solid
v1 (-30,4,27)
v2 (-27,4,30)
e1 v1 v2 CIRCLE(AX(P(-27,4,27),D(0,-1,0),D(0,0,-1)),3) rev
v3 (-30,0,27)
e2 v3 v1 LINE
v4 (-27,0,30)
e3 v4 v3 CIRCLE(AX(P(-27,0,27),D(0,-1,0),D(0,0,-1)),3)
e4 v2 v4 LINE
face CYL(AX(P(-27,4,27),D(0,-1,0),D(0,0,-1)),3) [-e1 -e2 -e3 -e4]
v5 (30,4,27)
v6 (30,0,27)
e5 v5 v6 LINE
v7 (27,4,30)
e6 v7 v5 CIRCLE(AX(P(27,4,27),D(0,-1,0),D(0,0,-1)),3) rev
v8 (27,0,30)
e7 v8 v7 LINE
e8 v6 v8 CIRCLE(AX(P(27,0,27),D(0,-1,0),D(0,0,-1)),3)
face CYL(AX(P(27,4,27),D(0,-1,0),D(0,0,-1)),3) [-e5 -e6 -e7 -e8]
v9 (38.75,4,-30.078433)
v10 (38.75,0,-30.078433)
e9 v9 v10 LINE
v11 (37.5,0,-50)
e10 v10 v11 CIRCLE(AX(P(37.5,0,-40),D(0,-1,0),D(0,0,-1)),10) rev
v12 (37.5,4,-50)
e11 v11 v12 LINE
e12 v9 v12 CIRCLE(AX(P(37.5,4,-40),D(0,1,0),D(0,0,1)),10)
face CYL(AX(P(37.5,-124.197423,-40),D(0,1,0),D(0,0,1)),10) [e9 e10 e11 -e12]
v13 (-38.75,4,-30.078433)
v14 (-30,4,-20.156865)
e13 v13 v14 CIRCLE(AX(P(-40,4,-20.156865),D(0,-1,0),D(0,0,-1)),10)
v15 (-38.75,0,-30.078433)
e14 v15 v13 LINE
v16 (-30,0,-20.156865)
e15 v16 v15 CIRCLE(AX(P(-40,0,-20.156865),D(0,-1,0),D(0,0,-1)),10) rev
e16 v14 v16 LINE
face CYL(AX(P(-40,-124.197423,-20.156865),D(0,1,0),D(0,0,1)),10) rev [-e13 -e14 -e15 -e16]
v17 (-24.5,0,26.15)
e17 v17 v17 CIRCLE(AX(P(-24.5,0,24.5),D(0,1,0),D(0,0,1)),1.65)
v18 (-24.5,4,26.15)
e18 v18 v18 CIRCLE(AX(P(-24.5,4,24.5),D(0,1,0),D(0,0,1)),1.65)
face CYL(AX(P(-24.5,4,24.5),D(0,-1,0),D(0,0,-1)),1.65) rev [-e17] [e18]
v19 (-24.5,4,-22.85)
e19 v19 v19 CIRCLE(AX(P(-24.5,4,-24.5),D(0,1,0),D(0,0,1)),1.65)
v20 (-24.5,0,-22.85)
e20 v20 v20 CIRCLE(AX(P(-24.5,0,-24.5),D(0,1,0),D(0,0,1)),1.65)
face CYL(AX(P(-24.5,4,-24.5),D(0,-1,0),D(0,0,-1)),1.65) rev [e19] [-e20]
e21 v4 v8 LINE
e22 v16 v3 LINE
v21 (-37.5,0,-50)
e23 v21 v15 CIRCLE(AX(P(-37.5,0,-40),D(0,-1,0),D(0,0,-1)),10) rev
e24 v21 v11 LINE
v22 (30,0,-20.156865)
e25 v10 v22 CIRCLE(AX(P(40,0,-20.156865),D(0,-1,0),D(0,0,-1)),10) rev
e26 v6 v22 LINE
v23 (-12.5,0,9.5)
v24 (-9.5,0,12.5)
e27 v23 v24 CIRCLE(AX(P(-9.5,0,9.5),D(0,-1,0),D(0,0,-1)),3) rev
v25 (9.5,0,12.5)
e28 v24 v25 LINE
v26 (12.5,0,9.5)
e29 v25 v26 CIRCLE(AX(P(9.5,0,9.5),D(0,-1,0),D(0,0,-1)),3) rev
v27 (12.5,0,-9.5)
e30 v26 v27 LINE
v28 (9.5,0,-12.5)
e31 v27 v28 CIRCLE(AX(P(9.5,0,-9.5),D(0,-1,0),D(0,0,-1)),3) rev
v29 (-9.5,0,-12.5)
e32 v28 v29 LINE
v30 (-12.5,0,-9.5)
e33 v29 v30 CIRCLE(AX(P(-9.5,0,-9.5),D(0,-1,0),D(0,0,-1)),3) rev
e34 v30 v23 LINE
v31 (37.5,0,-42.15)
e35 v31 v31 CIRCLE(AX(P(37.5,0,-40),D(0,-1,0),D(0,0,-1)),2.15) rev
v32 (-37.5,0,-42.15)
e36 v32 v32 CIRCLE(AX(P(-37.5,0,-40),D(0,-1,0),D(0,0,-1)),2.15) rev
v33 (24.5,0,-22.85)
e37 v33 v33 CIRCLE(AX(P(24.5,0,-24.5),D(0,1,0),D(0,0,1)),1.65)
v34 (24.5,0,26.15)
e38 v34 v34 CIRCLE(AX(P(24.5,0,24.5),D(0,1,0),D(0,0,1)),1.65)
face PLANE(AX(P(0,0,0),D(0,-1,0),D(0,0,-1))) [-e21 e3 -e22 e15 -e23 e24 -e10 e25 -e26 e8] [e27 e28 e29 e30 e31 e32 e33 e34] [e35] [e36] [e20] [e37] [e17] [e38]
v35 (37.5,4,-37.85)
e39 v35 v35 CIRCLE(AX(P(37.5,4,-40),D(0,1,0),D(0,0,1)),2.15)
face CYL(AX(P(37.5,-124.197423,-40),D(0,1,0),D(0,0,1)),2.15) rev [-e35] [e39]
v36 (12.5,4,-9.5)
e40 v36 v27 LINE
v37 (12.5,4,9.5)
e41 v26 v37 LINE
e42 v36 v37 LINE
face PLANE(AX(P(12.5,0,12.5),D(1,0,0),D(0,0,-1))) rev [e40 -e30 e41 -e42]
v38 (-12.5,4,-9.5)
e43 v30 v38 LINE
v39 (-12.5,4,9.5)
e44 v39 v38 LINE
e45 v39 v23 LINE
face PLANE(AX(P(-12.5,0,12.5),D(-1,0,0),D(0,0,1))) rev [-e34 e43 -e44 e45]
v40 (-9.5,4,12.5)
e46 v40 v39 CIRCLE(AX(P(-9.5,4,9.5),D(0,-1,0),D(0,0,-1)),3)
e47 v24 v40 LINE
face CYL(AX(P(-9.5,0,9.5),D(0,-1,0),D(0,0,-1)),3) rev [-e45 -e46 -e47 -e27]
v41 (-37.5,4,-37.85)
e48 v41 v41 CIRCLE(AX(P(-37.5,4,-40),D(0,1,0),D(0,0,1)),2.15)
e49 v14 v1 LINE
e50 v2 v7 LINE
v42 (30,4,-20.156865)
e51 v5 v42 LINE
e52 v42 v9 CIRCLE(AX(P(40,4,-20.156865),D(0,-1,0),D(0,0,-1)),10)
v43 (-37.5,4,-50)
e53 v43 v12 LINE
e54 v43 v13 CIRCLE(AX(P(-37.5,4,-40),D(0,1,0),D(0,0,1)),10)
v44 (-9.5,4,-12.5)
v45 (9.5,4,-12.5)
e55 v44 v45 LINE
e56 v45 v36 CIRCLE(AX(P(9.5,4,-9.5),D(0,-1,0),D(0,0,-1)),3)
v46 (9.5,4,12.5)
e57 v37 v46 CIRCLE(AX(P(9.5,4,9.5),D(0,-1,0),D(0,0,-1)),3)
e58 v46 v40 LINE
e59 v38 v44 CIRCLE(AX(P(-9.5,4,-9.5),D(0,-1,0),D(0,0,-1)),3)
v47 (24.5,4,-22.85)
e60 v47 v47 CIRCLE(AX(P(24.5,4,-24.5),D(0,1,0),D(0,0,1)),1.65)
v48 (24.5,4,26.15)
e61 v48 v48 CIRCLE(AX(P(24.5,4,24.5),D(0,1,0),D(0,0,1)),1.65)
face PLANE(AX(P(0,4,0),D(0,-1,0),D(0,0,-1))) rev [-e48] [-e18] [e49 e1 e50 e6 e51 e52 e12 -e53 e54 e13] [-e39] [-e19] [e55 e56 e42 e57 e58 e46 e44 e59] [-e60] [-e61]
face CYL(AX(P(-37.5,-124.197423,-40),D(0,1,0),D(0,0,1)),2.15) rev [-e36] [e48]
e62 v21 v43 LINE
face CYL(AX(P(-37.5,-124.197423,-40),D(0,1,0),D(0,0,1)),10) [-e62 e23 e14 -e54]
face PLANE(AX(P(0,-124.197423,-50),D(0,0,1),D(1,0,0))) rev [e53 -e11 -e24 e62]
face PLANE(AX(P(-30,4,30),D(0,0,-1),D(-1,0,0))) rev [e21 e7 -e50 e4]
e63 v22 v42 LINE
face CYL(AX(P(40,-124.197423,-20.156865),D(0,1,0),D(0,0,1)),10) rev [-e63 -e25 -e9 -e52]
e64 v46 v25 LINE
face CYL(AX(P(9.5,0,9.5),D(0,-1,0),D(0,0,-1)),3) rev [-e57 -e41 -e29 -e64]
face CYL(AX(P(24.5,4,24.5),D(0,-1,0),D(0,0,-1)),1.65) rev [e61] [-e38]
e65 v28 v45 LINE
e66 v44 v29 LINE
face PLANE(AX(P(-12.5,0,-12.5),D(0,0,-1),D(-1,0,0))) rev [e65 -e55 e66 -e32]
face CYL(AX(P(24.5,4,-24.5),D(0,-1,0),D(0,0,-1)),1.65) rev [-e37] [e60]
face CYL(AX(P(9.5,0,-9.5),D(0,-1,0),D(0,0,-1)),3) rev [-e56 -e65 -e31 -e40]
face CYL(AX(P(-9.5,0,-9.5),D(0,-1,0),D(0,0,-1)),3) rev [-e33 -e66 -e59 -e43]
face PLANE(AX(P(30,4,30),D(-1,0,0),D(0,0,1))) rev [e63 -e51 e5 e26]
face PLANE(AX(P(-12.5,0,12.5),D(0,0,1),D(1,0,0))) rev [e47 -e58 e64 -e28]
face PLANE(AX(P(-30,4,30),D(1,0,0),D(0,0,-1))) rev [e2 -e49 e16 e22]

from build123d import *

# Parameters (mm, degrees)
SKETCH1_W               = 60
SKETCH1_H               = 60
SKETCH1_R               = 1.65
BOSS_EXTRUDE1_DEPTH     = 4
SKETCH2_R               = 2.15
BOSS_EXTRUDE2_DEPTH     = 4
FILLET1_R               = 10
FILLET2_R               = 3
CUT_EXTRUDE1_DEPTH      = 70.081473638
CUT_EXTRUDE1_DEPTH_BACK = 70.081473638
SKETCH3_W               = 25
SKETCH3_H               = 25
FILLET3_R               = 3


with BuildPart() as part:
    # Sketch1 → Boss-Extrude1 (new body)
    with BuildSketch(Plane(origin=(0, 0, 0), x_dir=(1, 0, 0), z_dir=(0, 1, 0))):
        Rectangle(SKETCH1_W, SKETCH1_H)
        with Locations(Location((-24.5, 24.5, 0), (0, 0, 270))):
            Circle(SKETCH1_R, mode=Mode.SUBTRACT)
        with Locations(Location((24.5, 24.5, 0), (0, 0, 270))):
            Circle(SKETCH1_R, mode=Mode.SUBTRACT)
        with Locations(Location((-24.5, -24.5, 0), (0, 0, 270))):
            Circle(SKETCH1_R, mode=Mode.SUBTRACT)
        with Locations(Location((24.5, -24.5, 0), (0, 0, 270))):
            Circle(SKETCH1_R, mode=Mode.SUBTRACT)
    extrude(amount=BOSS_EXTRUDE1_DEPTH)

    # Sketch2 → Boss-Extrude2 (add)
    with BuildSketch(Plane(origin=(0, 4, 0), x_dir=(1, 0, 0), z_dir=(0, 1, 0))):
        with BuildLine():
            Line((-37.5, 50), (37.5, 50))
            ThreePointArc((37.5, 50), (47.5, 40), (37.5, 30))
            Line((37.5, 30), (-37.5, 30))
            ThreePointArc((-37.5, 30), (-47.5, 40), (-37.5, 50))
        make_face()
        with Locations(Location((-37.5, 40, 0), (0, 0, 270))):
            Circle(SKETCH2_R, mode=Mode.SUBTRACT)
        with Locations(Location((37.5, 40, 0), (0, 0, 270))):
            Circle(SKETCH2_R, mode=Mode.SUBTRACT)
    extrude(amount=-BOSS_EXTRUDE2_DEPTH)

    # Fillet1
    # the kernel refuses this fillet: 10 mm, written as the material it adds along each edge
    with BuildSketch(Plane(origin=(-30, 0, -30), x_dir=(-0.9999598282483387, 0, -0.008963363740972157), z_dir=(0, 1, 0))) as fillet1_piece_1:
        with BuildLine():
            CenterArc((9.911370685, 9.932373054), FILLET1_R, 180.51356979, 82.819244219)
            Line((-0.088227598, 9.842739417), (-1.088187426, 9.833776053))
            Line((-1.088187426, 9.833776053), (-0.999959828, -0.008963364))
            Line((-0.999959828, -0.008963364), (0.008963364, -0.999959828))
            ThreePointArc((0.008963364, -0.999959828), (7.508662076, -0.9327346), (8.6342496, -0.993237305))
            Line((8.6342496, -0.993237305), (8.750351517, 0))
        make_face()
    extrude(amount=4)
    with BuildSketch(Plane(origin=(30, 0, -30), x_dir=(0.9999598282483387, 0, -0.008963363740972154), z_dir=(0, 1, 0))) as fillet1_piece_2:
        with BuildLine():
            CenterArc((9.911370685, -9.932373054), FILLET1_R, 96.667185992, 82.819244219)
            Line((-0.088227598, -9.842739417), (-1.088187426, -9.833776053))
            Line((-1.088187426, -9.833776053), (-0.999959828, 0.008963364))
            Line((-0.999959828, 0.008963364), (0.008963364, 0.999959828))
            ThreePointArc((0.008963364, 0.999959828), (7.508662076, 0.9327346), (8.6342496, 0.993237305))
            Line((8.6342496, 0.993237305), (8.750351517, 0))
        make_face()
    extrude(amount=4)
    # the kernel refuses this fillet: 10 mm, written as the material it takes off along each edge

    # Fillet2
    fillet2_edges = [part.edges().sort_by_distance(p)[0] for p in [
        (30, 2, 30),
        (-30, 2, 30),
    ]]
    fillet(fillet2_edges, radius=FILLET2_R)

    # Sketch3 → Cut-Extrude1 (cut, two sides: drawn at the far end of the back side and taken through both)
    with BuildSketch(Plane(origin=(0, 4, 0), x_dir=(1, 0, 0), z_dir=(0, 1, 0)).offset(-CUT_EXTRUDE1_DEPTH_BACK)):
        Rectangle(SKETCH3_W, SKETCH3_H)
    extrude(amount=CUT_EXTRUDE1_DEPTH + CUT_EXTRUDE1_DEPTH_BACK, mode=Mode.SUBTRACT)

    # Fillet3
    fillet3_edges = [part.edges().sort_by_distance(p)[0] for p in [
        (12.5, 2, -12.5),
        (12.5, 2, 12.5),
        (-12.5, 2, 12.5),
        (-12.5, 2, -12.5),
    ]]
    fillet(fillet3_edges, radius=FILLET3_R)


solid = part.part
